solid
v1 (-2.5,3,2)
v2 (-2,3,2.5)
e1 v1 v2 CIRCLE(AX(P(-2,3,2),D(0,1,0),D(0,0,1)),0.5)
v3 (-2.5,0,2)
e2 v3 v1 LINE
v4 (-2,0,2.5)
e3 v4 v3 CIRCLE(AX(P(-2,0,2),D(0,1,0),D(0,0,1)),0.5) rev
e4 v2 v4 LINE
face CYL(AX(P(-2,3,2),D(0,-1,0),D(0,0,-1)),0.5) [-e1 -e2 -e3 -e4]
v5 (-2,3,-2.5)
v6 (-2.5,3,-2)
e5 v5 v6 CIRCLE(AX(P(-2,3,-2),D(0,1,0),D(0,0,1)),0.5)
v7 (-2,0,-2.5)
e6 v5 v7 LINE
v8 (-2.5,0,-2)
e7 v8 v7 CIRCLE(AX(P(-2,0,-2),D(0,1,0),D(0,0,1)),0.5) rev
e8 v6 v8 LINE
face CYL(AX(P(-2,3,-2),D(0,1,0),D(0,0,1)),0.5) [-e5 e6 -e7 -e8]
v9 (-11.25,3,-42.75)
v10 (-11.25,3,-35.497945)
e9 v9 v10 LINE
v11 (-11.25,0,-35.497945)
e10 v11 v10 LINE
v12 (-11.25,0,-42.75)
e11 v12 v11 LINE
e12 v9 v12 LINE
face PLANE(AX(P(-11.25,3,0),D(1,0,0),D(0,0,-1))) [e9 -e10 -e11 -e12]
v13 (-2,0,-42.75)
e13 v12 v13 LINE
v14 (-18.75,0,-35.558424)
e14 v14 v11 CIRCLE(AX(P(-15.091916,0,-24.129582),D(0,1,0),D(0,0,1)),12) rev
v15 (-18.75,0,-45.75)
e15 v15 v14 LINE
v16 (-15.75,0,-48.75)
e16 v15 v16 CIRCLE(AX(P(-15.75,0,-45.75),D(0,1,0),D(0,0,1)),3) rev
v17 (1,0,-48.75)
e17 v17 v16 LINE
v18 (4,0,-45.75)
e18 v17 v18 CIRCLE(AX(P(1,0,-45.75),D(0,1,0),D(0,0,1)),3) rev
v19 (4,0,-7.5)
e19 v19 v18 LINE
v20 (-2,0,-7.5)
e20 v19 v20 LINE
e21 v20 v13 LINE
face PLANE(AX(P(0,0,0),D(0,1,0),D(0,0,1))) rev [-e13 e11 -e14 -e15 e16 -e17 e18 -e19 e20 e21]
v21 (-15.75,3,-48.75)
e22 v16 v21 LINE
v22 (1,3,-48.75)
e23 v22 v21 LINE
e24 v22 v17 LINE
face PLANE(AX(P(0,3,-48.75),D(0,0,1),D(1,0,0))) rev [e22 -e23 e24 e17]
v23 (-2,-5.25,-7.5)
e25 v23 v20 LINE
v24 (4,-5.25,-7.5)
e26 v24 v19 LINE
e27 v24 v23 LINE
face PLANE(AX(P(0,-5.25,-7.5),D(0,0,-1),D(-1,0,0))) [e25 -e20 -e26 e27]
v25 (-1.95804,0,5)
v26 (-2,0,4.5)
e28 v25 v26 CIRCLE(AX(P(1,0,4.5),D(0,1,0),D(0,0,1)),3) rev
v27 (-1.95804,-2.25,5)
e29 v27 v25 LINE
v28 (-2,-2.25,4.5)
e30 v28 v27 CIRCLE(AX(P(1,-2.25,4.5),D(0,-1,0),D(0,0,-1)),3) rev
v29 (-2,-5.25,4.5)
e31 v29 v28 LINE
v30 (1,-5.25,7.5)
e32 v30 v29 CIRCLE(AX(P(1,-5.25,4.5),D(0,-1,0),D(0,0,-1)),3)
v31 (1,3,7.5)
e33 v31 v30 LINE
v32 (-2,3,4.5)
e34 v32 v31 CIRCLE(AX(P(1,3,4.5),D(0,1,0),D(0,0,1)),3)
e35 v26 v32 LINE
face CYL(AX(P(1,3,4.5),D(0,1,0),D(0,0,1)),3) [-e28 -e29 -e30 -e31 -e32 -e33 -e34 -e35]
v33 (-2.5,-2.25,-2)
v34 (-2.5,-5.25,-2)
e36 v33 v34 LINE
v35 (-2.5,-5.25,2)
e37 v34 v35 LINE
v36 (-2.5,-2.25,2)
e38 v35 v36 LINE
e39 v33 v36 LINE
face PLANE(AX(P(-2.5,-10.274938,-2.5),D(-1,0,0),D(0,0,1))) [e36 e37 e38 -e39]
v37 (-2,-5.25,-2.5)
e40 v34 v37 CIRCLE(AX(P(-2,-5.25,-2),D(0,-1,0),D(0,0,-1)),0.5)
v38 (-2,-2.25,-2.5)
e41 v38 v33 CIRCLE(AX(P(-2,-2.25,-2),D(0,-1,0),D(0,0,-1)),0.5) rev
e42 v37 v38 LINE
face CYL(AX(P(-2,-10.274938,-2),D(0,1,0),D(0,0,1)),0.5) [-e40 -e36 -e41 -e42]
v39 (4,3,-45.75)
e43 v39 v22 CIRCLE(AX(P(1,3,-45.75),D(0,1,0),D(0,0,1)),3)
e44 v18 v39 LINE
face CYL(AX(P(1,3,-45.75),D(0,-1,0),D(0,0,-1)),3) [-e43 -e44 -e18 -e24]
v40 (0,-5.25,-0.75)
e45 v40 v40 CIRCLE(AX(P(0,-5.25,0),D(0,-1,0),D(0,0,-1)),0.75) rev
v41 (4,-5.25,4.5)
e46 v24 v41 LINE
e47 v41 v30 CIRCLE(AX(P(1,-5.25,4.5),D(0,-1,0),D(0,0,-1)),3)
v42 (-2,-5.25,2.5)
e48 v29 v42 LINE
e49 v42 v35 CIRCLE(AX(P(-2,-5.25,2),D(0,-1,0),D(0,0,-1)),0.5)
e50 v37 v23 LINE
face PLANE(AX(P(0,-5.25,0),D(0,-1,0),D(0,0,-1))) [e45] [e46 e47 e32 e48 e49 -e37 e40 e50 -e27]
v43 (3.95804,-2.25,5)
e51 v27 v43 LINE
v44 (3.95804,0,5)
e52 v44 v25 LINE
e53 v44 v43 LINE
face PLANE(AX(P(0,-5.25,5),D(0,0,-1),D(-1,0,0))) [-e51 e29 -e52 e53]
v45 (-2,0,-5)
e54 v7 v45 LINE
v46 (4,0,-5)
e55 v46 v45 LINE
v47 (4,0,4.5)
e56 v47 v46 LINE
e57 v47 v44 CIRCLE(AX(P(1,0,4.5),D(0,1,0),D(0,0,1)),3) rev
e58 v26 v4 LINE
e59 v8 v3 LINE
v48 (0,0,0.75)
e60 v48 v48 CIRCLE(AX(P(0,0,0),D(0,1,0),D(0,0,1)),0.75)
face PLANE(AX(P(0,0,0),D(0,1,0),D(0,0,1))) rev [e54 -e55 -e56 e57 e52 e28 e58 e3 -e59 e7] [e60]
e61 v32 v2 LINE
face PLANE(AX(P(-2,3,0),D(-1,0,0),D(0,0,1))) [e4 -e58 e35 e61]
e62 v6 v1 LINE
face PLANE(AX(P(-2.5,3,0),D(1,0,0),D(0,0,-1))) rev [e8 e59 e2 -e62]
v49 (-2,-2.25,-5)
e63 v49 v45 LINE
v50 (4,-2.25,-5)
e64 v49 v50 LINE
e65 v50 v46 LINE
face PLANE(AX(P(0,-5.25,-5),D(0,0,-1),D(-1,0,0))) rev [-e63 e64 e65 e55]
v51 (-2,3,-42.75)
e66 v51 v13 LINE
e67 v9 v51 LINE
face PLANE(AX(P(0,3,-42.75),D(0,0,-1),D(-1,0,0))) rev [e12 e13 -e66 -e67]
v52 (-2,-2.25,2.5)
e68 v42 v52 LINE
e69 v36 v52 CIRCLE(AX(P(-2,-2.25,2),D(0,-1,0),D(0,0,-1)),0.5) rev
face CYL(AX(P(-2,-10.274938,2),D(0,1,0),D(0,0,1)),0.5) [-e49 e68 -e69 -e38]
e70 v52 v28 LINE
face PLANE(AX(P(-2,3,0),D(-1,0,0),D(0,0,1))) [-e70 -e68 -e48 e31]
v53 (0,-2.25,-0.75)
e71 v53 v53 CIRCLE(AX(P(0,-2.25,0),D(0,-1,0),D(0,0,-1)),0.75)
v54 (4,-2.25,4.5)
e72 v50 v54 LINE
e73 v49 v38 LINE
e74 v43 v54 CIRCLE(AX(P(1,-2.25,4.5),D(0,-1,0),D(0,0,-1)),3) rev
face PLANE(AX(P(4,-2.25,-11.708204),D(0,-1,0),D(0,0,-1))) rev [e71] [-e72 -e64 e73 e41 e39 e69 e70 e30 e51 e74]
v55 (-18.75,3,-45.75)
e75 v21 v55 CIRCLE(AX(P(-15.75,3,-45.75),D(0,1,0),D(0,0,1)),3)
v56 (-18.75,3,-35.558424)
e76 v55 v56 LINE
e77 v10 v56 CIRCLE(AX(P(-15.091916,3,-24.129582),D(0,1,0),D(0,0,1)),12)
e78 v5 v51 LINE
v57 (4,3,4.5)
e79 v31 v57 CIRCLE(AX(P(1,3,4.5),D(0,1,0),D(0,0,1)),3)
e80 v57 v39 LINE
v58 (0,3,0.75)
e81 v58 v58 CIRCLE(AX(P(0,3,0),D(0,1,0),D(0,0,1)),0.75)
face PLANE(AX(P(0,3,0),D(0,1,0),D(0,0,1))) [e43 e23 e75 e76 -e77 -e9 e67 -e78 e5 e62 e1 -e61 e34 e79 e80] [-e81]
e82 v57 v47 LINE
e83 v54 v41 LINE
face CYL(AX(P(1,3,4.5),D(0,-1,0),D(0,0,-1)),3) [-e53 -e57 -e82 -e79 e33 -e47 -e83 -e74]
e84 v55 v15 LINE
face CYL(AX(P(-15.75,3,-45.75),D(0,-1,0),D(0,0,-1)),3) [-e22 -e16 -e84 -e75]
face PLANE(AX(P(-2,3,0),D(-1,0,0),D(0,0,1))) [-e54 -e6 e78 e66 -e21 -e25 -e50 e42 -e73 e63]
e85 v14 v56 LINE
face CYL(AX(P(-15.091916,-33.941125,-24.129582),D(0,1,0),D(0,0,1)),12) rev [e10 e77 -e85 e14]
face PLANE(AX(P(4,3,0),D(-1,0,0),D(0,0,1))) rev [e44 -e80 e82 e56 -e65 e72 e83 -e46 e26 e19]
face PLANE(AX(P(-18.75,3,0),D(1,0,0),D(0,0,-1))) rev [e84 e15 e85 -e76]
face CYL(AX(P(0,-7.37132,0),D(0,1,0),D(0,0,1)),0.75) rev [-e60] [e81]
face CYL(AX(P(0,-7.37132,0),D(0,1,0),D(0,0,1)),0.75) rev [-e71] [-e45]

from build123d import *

# Parameters (mm, degrees)
BOSS_EXTRUDE1_DEPTH = 3
SKETCH2_R           = 12
CUT_EXTRUDE1_DEPTH  = 3
SKETCH5_W           = 6
SKETCH5_H           = 2.5
BOSS_EXTRUDE2_DEPTH = 5.25
SKETCH6_W           = 6
SKETCH6_H           = 3
BOSS_EXTRUDE3_DEPTH = 10
CUT_EXTRUDE2_REACH  = 54.879
SKETCH4_R           = 0.75
FILLET1_R           = 3
SKETCH8_W           = 0.5
SKETCH8_H           = 5
BOSS_EXTRUDE4_DEPTH = 3
FILLET2_R           = 0.5


# Some blends are built 0.0001 mm under size
with BuildPart() as part:
    # Sketch1 → Boss-Extrude1 (new body)
    with BuildSketch(Plane(origin=(0, 0, 0), x_dir=(1, 0, 0), z_dir=(0, 1, 0))):
        Polygon((-2, -7.5), (4, -7.5), (4, 48.75), (-18.75, 48.75), (-18.75, 28.369317262), (-11.25, 28.369317262), (-11.25, 42.75), (-2, 42.75), (-2, 2.5), (-2.5, 2.5), (-2.5, -2.5), (-2, -2.5), align=None)
    extrude(amount=BOSS_EXTRUDE1_DEPTH)

    # Sketch2 → Cut-Extrude1 (cut)
    with BuildSketch(Plane(origin=(0, 3, 0), x_dir=(1, 0, 0), z_dir=(0, 1, 0))):
        with Locations((-15.091915752, 24.129582051)):
            Circle(SKETCH2_R)
    extrude(amount=-CUT_EXTRUDE1_DEPTH, mode=Mode.SUBTRACT)

    # Sketch5 → Boss-Extrude2 (add)
    with BuildSketch(Plane.XZ):
        with Locations((1, -6.25)):
            Rectangle(SKETCH5_W, SKETCH5_H)
        with Locations((1, 6.25)):
            Rectangle(SKETCH5_W, SKETCH5_H)
    extrude(amount=BOSS_EXTRUDE2_DEPTH)

    # Sketch6 → Boss-Extrude3 (add)
    with BuildSketch(Plane(origin=(0, 0, 5), x_dir=(-1, 0, 0), z_dir=(0, 0, -1))):
        with Locations((-1, -3.75)):
            Rectangle(SKETCH6_W, SKETCH6_H)
    extrude(amount=BOSS_EXTRUDE3_DEPTH)

    # Cut-Extrude2: up to this face of the body (flat: up to its plane)
    cut_extrude2_end = Plane(part.part.faces().sort_by_distance((1, -5.25, 0))[0])
    # Sketch4 → Cut-Extrude2 (cut, up to the picked face)
    with BuildSketch(Plane(origin=(0, 3, 0), x_dir=(1, 0, 0), z_dir=(0, 1, 0)), mode=Mode.PRIVATE) as cut_extrude2_sk1:
        with Locations(Location((0, 0, 0), (0, 0, 90))):
            Circle(SKETCH4_R)
    cut_extrude2_tool1 = split(extrude(cut_extrude2_sk1.sketch, amount=-CUT_EXTRUDE2_REACH, mode=Mode.PRIVATE), bisect_by=cut_extrude2_end, keep=Keep.BOTH, mode=Mode.PRIVATE)
    add(cut_extrude2_tool1.solids().sort_by(Axis((0, 3, 0), (0, -1, 0)))[0], mode=Mode.SUBTRACT)

    # Fillet1
    # the kernel refuses this fillet: 3 mm, written as the material it takes off along each edge
    with BuildSketch(Plane(origin=(-18.75, -7.5, -48.75), x_dir=(1, 0, 0), z_dir=(0, 1, 0)), Plane(origin=(4, -7.5, -48.75), x_dir=(0, 0, 1), z_dir=(0, 1, 0))) as fillet1_piece_1:
        with BuildLine():
            CenterArc((FILLET1_R, -FILLET1_R), FILLET1_R, 90, 90)
            Line((0, -FILLET1_R), (0, 0))
            Line((0, 0), (FILLET1_R, 0))
        make_face()
    extrude(amount=18, mode=Mode.SUBTRACT)
    with BuildSketch(Plane(origin=(4, -12.75, 7.5), x_dir=(-1, 0, 0), z_dir=(0, 1, 0)), Plane(origin=(-2, -12.75, 7.5), x_dir=(0, 0, -1), z_dir=(0, 1, 0))) as fillet1_piece_2:
        with BuildLine():
            CenterArc((FILLET1_R, -FILLET1_R), FILLET1_R, 90, 90)
            Line((0, -FILLET1_R), (0, 0))
            Line((0, 0), (FILLET1_R, 0))
        make_face()
    extrude(amount=23.25, mode=Mode.SUBTRACT)

    # Sketch8 → Boss-Extrude4 (add)
    with BuildSketch(Plane(origin=(0, -2.25, 0), x_dir=(1, 0, 0), z_dir=(0, 1, 0))):
        with Locations((-2.25, 0)):
            Rectangle(SKETCH8_W, SKETCH8_H)
    extrude(amount=-BOSS_EXTRUDE4_DEPTH)

    # Fillet2
    fillet2_edges = [part.edges().sort_by_distance(p)[0] for p in [
        (-2.5, 1.5, 2.5),
        (-2.5, 1.5, -2.5),
        (-2.5, -3.75, 2.5),
        (-2.5, -3.75, -2.5),
    ]]
    fillet(fillet2_edges, radius=FILLET2_R - 0.0001)  # a hair under: the kernel refuses the full size


solid = part.part
